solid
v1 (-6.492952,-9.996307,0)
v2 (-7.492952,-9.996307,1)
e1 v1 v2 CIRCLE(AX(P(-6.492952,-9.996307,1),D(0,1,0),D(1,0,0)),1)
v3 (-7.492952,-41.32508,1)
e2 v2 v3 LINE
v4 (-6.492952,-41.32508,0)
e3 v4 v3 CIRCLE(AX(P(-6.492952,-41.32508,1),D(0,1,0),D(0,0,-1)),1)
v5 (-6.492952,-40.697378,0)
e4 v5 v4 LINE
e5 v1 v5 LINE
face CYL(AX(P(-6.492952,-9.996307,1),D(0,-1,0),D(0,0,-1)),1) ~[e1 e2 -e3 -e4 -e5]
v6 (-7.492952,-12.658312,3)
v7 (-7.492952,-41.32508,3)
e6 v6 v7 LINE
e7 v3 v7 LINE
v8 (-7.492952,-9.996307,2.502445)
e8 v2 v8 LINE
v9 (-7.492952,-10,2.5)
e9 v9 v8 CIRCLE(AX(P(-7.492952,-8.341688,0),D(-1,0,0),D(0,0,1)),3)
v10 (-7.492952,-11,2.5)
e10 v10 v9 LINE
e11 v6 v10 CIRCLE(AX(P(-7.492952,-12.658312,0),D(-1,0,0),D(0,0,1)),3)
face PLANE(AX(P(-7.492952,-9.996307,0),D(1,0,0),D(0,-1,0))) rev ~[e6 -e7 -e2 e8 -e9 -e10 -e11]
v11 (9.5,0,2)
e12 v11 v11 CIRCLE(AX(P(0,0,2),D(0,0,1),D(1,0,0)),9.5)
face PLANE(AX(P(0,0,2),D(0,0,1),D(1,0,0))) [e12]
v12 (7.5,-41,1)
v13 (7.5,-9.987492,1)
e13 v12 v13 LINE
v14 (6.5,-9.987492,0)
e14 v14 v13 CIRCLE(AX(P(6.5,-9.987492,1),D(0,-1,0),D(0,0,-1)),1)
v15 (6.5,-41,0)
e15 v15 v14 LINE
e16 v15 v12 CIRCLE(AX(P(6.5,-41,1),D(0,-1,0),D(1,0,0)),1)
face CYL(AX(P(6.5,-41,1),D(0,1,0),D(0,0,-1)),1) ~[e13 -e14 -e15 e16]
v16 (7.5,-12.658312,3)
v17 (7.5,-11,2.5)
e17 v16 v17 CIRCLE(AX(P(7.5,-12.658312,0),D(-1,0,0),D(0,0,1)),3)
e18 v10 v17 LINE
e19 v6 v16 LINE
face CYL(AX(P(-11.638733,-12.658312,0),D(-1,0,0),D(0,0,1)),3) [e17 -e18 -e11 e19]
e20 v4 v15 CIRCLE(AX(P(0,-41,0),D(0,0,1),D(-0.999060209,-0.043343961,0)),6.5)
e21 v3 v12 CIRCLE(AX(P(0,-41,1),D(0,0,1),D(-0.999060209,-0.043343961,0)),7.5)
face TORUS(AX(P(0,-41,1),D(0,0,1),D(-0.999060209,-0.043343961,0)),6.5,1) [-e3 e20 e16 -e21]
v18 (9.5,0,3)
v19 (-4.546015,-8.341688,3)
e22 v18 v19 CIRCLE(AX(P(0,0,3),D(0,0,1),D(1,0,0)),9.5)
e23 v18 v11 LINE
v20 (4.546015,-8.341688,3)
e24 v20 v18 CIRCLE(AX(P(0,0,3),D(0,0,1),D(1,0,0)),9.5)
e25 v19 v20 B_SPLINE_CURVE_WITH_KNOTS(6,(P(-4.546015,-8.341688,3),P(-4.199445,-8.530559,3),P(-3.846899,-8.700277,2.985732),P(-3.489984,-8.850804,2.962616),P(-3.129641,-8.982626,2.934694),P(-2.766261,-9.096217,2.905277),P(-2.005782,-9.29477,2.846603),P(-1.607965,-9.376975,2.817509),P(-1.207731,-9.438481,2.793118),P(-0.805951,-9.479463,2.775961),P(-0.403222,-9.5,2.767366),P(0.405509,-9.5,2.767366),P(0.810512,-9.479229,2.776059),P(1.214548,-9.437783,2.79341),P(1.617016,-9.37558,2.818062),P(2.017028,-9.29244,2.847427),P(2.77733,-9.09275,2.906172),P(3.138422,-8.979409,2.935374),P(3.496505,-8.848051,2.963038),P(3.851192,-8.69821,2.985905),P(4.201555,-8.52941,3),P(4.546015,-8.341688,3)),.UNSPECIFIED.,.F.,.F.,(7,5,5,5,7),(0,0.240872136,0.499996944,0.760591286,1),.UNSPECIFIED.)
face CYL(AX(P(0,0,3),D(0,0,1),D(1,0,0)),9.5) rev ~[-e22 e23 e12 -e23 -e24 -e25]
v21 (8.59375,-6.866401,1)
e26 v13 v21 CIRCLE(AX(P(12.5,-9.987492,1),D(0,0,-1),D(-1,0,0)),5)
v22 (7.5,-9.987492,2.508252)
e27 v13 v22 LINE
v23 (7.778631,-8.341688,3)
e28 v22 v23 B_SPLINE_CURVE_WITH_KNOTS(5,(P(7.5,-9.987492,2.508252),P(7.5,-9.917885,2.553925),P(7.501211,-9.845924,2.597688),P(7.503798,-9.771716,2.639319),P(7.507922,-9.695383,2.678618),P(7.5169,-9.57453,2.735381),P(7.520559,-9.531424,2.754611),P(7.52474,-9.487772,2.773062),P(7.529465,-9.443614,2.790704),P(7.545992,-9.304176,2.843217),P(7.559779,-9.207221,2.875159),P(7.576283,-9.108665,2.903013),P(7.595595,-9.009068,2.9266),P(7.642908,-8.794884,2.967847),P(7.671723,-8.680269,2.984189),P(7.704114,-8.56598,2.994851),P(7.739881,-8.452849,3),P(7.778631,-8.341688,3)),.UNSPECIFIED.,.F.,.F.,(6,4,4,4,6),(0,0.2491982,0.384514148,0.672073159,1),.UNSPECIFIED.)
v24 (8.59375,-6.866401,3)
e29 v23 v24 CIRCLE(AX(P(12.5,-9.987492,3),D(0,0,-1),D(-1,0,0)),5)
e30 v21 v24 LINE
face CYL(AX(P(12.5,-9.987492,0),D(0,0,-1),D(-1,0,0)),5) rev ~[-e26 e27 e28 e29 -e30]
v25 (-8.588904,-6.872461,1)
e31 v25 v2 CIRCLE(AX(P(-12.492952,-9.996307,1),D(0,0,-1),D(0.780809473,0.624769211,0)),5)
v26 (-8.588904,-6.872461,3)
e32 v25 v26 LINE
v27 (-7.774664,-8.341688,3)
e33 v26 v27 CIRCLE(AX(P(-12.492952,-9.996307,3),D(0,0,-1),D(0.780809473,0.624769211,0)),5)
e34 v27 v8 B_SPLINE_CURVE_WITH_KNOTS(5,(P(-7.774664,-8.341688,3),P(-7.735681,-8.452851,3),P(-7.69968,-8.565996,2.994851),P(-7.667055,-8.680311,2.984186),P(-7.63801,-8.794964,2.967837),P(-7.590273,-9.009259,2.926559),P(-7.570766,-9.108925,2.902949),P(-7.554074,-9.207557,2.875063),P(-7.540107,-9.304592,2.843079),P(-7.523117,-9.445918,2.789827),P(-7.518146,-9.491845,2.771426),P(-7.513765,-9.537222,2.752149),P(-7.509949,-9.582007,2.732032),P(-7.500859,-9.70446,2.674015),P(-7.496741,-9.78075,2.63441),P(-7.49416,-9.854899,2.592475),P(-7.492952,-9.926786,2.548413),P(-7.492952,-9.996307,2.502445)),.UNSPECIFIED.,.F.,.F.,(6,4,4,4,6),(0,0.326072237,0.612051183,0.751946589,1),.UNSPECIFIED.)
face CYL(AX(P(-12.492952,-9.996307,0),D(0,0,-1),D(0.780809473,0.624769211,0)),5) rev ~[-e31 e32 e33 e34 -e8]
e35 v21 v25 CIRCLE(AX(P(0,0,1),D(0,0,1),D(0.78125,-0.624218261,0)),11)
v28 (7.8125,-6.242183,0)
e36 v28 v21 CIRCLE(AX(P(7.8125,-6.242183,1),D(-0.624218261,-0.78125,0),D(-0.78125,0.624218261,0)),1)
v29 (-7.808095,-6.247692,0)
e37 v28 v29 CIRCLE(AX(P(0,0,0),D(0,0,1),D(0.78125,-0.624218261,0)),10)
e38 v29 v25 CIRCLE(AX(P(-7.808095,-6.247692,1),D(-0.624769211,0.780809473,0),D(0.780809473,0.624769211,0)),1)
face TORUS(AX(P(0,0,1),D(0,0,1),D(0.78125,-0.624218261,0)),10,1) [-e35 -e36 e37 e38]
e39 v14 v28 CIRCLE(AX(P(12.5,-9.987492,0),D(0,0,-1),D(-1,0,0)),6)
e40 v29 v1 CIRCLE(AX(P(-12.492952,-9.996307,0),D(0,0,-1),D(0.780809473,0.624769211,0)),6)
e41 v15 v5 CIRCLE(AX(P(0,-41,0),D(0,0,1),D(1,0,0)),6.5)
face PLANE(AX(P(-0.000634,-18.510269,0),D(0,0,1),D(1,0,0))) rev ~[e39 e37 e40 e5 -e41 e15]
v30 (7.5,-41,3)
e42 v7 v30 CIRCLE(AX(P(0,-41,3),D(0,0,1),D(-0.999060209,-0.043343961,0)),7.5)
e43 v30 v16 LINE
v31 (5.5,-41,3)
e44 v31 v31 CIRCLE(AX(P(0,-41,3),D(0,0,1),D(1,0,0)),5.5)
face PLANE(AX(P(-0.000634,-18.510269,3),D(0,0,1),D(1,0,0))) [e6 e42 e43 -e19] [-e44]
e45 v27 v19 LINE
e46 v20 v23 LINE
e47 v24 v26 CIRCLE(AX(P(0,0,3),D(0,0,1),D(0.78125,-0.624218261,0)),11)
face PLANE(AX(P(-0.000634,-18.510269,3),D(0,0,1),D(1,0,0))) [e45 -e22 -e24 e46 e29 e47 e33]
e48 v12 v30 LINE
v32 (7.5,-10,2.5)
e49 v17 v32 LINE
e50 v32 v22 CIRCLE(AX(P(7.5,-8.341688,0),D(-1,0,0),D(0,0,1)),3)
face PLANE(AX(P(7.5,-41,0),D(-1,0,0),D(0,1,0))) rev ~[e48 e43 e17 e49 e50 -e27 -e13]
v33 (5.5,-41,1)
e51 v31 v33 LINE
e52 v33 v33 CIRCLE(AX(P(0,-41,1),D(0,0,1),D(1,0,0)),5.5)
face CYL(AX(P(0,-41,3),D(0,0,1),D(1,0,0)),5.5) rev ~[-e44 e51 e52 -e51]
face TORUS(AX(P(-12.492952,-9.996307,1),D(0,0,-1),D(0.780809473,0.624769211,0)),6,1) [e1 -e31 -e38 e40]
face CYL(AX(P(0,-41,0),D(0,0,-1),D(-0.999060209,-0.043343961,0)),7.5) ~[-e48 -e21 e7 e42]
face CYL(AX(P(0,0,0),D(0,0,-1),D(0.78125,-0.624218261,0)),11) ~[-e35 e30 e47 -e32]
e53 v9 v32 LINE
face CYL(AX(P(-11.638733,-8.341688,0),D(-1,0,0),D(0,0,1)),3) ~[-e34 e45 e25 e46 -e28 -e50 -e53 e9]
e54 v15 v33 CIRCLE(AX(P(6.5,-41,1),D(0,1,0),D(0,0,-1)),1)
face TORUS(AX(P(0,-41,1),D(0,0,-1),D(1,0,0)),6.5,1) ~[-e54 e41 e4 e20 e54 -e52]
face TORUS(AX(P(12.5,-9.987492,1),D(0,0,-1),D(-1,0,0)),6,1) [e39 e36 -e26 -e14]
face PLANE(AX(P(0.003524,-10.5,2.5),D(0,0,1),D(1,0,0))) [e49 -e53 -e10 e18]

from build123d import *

# Parameters (mm, degrees)
F1_DEPTH    = 3
F2_R        = 9.5
F3_DEPTH    = 1
F4_W        = 14.9929515668
F4_H        = 1
F5_DEPTH    = 0.5
F6_T1_DEPTH = 23.2845135427
F7_R        = 5.5
F8_DEPTH    = 3.0010001
F9_F1_R     = 1


# Not quite as in the source:
# - a fillet or chamfer that OpenCascade refuses, or shapes differently, is made with other operations: its cross-section is extruded or revolved along the edge and cut away or added


with BuildPart() as f1:
    # F0 (on Top) → F1 (new body)
    with BuildSketch(Plane.XY):
        with BuildLine():
            ThreePointArc((7.5, -9.9874921777), (7.781353478, -8.3338976083), (8.59375, -6.8664008722))
            ThreePointArc((8.59375, -6.8664008722), (-0.0038797807, 10.9999993158), (-8.5889042022, -6.8724613208))
            ThreePointArc((-8.5889042022, -6.8724613208), (-7.7748885732, -8.3410486079), (-7.4929515668, -9.9963073757))
            Line((-7.4929515668, -9.9963073757), (-7.4929515668, -40.6749202897))
            Line((-7.4929515668, -40.6749202897), (-7.4929515668, -41.3250797103))
            ThreePointArc((-7.4929515668, -41.3250797103), (0.162578057, -48.4982376846), (7.5, -41))
            Line((7.5, -41), (7.5, -9.9874921777))
        make_face()
    extrude(amount=F1_DEPTH)

    # F2 (on face) → F3 (cut)
    with BuildSketch(Plane.XY.offset(3)):
        Circle(F2_R)
    extrude(amount=-F3_DEPTH, mode=Mode.SUBTRACT)

    # F4 (on face) → F5 (cut)
    with BuildSketch(Plane.XY.offset(3)):
        with Locations((0.0035242166, -10.5)):
            Rectangle(F4_W, F4_H)
    extrude(amount=-F5_DEPTH, mode=Mode.SUBTRACT)

    # F6: fillet of radius 3 on 2 edges, made by hand

    # F6_s2 → F6_t1 (cut)
    with BuildSketch(Plane.YZ.offset(-11.6387325547)):
        with BuildLine():
            ThreePointArc((-12.6583123952, 3), (-11.7922869914, 2.8722813233), (-11, 2.5))
            Line((-11, 2.5), (-11, 3))
            Line((-11, 3), (-12.6583123952, 3))
        make_face()
        with BuildLine():
            ThreePointArc((-8.3416876048, 3), (-9.2077130086, 2.8722813233), (-10, 2.5))
            Line((-10, 2.5), (-10, 3))
            Line((-10, 3), (-8.3416876048, 3))
        make_face()
    extrude(amount=F6_T1_DEPTH, mode=Mode.SUBTRACT)

    # F7 (on face) → F8 (cut, through all)
    with BuildSketch(Plane.XY.offset(3)):
        with Locations((0, -41)):
            Circle(F7_R)
    extrude(amount=-F8_DEPTH, mode=Mode.SUBTRACT)

    # F9: fillet of radius 1 on 7 edges, made by hand

    # F9_f1
    f9_f1_edges = [f1.edges().sort_by_distance(p)[0] for p in [
        (-7.7748885732, -8.3410486079, 0),
        (-0.0038797807, 10.9999993158, 0),
        (-7.4929515668, -25.660693543, 0),
        (7.781353478, -8.3338976083, 0),
        (0.162578057, -48.4982376846, 0),
        (7.5, -25.4937460889, 0),
    ]]
    fillet(f9_f1_edges, radius=F9_F1_R)

    # F9_s2 → F9_t3 (revolve, cut)
    with BuildSketch(Plane.XZ.offset(41)):
        with BuildLine():
            ThreePointArc((6.5, 0), (5.7928932188, 0.2928932188), (5.5, 1))
            Line((5.5, 1), (5.48, 1))
            Line((5.48, 1), (5.48, -0.02))
            Line((5.48, -0.02), (6.5, -0.02))
            Line((6.5, -0.02), (6.5, 0))
        make_face()
    revolve(axis=Axis((0, -41, 0), (0, 0, 1)), mode=Mode.SUBTRACT)


solid = f1.part
